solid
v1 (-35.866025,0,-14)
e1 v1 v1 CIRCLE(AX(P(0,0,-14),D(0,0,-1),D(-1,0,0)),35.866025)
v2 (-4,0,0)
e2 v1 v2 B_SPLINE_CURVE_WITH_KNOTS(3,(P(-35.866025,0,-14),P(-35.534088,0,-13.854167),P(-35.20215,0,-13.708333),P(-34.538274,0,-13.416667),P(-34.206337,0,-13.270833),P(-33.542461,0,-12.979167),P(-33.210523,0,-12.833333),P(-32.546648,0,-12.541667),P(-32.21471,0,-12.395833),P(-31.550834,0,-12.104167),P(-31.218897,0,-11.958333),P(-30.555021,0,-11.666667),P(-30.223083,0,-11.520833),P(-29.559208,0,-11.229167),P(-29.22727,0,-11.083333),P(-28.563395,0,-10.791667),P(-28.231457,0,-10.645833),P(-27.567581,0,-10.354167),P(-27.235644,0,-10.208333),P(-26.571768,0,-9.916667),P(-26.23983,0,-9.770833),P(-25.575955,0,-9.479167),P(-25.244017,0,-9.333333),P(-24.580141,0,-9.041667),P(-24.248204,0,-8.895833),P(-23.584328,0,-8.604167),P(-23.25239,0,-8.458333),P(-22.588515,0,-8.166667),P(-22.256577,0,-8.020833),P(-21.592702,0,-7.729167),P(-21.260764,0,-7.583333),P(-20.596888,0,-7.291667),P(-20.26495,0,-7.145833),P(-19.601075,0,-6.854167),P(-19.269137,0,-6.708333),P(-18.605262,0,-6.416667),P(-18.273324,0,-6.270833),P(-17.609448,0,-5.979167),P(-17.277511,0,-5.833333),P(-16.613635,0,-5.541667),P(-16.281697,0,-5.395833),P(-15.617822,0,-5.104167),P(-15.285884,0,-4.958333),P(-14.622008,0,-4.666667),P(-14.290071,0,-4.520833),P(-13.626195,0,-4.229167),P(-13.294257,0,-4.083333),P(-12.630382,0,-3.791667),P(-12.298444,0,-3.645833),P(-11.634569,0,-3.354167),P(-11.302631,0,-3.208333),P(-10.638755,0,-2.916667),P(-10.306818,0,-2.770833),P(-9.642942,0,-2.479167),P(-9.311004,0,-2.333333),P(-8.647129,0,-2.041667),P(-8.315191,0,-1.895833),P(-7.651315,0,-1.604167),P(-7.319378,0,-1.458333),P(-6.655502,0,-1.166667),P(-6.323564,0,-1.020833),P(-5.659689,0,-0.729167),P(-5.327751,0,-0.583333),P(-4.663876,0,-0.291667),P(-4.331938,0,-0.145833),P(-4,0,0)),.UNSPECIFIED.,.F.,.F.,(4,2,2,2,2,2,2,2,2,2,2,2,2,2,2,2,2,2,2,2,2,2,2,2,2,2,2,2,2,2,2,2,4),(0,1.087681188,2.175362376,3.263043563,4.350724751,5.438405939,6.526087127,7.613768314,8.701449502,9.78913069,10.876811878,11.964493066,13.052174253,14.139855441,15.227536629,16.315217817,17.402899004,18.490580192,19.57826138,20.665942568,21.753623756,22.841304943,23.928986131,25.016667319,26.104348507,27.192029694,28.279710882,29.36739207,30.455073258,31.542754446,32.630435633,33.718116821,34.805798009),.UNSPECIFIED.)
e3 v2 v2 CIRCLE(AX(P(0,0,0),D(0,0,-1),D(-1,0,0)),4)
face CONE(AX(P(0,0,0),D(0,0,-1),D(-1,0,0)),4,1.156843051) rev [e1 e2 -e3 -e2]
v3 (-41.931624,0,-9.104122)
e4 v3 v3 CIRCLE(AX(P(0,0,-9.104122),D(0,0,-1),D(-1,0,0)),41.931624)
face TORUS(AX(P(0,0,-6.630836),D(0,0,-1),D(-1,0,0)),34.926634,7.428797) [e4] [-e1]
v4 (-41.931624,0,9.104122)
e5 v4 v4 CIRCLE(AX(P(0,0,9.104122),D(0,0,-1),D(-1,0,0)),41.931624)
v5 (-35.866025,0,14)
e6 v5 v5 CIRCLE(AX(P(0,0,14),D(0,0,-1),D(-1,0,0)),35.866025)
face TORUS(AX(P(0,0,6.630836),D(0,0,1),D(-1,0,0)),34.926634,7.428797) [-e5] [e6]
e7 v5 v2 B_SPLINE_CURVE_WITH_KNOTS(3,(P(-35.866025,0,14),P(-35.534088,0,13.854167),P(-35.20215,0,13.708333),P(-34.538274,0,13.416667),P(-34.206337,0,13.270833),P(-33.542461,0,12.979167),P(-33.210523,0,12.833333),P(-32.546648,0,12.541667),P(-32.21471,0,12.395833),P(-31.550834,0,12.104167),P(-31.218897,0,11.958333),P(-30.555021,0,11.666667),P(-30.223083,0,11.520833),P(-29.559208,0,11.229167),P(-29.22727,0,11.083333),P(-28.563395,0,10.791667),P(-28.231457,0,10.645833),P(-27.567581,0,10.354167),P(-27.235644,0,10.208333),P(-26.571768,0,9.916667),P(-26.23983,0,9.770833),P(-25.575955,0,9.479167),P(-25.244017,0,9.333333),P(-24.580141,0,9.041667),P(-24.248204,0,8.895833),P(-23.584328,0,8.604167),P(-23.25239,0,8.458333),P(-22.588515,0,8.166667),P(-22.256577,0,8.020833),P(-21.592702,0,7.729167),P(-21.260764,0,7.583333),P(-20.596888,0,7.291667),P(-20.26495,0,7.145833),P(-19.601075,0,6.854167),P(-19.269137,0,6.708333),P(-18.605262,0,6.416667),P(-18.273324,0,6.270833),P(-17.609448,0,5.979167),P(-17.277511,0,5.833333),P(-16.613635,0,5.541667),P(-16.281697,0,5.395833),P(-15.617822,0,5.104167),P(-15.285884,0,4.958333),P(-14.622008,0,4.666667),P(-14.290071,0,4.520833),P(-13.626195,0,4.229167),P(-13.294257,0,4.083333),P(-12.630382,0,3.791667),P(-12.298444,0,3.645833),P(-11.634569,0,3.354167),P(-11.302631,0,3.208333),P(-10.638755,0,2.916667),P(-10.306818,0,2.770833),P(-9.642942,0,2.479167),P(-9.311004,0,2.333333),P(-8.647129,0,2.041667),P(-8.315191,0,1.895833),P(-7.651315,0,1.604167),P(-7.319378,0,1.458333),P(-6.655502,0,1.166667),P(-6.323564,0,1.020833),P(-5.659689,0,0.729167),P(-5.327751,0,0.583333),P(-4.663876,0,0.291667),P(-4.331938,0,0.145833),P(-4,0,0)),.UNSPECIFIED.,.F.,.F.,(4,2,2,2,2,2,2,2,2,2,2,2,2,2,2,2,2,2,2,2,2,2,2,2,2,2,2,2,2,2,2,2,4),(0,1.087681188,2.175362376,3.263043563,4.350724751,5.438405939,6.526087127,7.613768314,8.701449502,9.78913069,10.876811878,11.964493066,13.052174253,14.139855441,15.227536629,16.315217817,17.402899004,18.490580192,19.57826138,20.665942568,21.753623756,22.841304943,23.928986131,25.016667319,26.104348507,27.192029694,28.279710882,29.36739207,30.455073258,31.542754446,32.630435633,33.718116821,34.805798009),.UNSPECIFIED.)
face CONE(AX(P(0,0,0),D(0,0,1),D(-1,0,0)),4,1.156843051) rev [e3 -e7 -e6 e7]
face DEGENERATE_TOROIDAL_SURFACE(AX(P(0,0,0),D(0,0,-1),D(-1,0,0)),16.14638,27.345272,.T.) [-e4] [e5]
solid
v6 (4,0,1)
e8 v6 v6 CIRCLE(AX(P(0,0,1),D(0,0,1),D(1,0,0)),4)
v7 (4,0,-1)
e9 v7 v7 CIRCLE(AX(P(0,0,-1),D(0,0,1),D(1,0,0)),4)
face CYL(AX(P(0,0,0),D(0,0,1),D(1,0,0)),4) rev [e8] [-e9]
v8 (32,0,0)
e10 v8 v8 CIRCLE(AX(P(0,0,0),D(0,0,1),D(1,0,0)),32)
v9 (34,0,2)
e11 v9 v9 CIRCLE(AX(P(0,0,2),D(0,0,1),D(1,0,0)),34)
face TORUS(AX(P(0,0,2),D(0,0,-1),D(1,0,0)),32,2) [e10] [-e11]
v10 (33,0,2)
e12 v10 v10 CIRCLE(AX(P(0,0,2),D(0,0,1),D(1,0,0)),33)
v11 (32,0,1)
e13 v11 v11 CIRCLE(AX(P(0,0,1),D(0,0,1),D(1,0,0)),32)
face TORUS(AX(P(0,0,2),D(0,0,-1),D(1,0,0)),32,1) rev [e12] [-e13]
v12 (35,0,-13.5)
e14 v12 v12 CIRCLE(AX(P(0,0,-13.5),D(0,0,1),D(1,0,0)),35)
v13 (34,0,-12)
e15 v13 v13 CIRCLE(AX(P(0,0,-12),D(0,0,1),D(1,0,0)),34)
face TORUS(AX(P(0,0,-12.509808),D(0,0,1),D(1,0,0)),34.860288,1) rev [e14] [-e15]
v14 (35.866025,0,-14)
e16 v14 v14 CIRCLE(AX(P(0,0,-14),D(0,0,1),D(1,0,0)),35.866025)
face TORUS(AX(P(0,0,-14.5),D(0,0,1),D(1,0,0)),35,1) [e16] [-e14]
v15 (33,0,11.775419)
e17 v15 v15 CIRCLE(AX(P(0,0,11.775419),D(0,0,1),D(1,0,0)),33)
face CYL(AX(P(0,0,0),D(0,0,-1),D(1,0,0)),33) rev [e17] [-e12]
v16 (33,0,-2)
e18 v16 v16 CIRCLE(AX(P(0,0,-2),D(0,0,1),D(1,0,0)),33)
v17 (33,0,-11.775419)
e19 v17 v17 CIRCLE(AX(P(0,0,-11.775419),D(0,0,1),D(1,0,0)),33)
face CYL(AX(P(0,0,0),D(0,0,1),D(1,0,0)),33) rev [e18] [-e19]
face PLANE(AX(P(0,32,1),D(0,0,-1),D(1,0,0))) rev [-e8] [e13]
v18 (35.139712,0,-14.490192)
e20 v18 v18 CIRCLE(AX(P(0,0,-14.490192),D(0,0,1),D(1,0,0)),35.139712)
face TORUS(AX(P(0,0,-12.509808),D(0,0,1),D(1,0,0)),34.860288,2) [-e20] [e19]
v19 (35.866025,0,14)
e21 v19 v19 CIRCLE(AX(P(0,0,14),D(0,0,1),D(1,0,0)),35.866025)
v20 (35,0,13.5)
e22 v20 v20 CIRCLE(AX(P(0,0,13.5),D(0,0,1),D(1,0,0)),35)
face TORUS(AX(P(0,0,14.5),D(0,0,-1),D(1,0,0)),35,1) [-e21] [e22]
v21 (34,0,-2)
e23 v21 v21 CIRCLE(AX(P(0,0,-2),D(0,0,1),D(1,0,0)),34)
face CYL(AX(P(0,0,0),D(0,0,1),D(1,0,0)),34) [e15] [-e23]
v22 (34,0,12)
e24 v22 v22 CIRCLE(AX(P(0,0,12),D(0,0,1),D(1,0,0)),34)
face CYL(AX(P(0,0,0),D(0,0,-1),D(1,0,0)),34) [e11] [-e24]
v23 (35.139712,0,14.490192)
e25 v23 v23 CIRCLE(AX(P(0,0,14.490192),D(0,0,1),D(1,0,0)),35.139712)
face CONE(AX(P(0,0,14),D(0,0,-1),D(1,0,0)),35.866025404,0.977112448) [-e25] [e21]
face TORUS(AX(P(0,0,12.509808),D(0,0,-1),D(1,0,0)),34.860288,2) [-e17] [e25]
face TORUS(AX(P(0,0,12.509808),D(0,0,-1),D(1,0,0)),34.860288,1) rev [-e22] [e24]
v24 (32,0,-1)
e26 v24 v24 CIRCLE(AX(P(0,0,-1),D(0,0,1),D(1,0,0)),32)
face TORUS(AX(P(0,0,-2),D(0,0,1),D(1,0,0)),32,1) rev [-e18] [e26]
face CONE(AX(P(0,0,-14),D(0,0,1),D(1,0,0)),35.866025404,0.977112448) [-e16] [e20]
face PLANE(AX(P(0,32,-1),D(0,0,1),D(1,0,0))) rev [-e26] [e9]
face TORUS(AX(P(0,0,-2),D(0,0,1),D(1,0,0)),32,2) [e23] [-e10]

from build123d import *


# Read off the part's stored shape, not the designer's step: Revolve-Thin1
with BuildPart() as part:
    # Revolve-Thin1 outline → Revolve-Thin1 (revolve)
    with BuildSketch(Plane.XZ):
        with BuildLine():
            ThreePointArc((33, -11.775418724), (33.289529814, -13.747837508), (35.139711654, -14.490192231))
            Line((35.139711654, -14.490192231), (35.866025404, -14))
            ThreePointArc((35.866025404, -14), (35.5, -13.633974596), (35, -13.5))
            ThreePointArc((35, -13.5), (34.028238052, -13.064507966), (34, -12))
            Line((34, -12), (34, -2))
            ThreePointArc((34, -2), (33.414213562, -0.585786438), (32, 0))
            Line((32, 0), (4, 0))
            Line((4, 0), (4, -1))
            Line((4, -1), (32, -1))
            ThreePointArc((32, -1), (32.707106781, -1.292893219), (33, -2))
            Line((33, -2), (33, -11.775418724))
        make_face()
    revolve(axis=Axis((0, 0, 0), (0, 0, 1)))

    # Mirror4 2: part across plane


with BuildPart() as body_2:
    # Sketch10 → Revolve4 (revolve)
    with BuildSketch(Plane(origin=(0, 0, 0), x_dir=(0, 0, -1), z_dir=(1, 0, 0)), mode=Mode.PRIVATE) as revolve4_sk:
        with BuildLine():
            Line((0, 4), (0, 43.49165142))
            ThreePointArc((0, 43.49165142), (4.618406935, 43.098823056), (9.104122467, 41.931624312))
            ThreePointArc((9.104122467, 41.931624312), (12.411522036, 39.592542807), (14, 35.866025404))
            Line((14, 35.866025404), (0, 4))
        make_face()
    revolve(revolve4_sk.sketch.rotate(Axis((0, 0, -25.261416216), (0, 0, 1)), 90), axis=Axis((0, 0, -25.261416216), (0, 0, 1)))

    # Mirror4: body 2 across plane


with BuildPart() as body_2_1:
    add(body_2.part)
    add(body_2.part.mirror(Plane.XY))


with BuildPart() as part_1:
    add(part.part)
    add(part.part.mirror(Plane.XY))


solid = Compound([body_2_1.part, part_1.part])
